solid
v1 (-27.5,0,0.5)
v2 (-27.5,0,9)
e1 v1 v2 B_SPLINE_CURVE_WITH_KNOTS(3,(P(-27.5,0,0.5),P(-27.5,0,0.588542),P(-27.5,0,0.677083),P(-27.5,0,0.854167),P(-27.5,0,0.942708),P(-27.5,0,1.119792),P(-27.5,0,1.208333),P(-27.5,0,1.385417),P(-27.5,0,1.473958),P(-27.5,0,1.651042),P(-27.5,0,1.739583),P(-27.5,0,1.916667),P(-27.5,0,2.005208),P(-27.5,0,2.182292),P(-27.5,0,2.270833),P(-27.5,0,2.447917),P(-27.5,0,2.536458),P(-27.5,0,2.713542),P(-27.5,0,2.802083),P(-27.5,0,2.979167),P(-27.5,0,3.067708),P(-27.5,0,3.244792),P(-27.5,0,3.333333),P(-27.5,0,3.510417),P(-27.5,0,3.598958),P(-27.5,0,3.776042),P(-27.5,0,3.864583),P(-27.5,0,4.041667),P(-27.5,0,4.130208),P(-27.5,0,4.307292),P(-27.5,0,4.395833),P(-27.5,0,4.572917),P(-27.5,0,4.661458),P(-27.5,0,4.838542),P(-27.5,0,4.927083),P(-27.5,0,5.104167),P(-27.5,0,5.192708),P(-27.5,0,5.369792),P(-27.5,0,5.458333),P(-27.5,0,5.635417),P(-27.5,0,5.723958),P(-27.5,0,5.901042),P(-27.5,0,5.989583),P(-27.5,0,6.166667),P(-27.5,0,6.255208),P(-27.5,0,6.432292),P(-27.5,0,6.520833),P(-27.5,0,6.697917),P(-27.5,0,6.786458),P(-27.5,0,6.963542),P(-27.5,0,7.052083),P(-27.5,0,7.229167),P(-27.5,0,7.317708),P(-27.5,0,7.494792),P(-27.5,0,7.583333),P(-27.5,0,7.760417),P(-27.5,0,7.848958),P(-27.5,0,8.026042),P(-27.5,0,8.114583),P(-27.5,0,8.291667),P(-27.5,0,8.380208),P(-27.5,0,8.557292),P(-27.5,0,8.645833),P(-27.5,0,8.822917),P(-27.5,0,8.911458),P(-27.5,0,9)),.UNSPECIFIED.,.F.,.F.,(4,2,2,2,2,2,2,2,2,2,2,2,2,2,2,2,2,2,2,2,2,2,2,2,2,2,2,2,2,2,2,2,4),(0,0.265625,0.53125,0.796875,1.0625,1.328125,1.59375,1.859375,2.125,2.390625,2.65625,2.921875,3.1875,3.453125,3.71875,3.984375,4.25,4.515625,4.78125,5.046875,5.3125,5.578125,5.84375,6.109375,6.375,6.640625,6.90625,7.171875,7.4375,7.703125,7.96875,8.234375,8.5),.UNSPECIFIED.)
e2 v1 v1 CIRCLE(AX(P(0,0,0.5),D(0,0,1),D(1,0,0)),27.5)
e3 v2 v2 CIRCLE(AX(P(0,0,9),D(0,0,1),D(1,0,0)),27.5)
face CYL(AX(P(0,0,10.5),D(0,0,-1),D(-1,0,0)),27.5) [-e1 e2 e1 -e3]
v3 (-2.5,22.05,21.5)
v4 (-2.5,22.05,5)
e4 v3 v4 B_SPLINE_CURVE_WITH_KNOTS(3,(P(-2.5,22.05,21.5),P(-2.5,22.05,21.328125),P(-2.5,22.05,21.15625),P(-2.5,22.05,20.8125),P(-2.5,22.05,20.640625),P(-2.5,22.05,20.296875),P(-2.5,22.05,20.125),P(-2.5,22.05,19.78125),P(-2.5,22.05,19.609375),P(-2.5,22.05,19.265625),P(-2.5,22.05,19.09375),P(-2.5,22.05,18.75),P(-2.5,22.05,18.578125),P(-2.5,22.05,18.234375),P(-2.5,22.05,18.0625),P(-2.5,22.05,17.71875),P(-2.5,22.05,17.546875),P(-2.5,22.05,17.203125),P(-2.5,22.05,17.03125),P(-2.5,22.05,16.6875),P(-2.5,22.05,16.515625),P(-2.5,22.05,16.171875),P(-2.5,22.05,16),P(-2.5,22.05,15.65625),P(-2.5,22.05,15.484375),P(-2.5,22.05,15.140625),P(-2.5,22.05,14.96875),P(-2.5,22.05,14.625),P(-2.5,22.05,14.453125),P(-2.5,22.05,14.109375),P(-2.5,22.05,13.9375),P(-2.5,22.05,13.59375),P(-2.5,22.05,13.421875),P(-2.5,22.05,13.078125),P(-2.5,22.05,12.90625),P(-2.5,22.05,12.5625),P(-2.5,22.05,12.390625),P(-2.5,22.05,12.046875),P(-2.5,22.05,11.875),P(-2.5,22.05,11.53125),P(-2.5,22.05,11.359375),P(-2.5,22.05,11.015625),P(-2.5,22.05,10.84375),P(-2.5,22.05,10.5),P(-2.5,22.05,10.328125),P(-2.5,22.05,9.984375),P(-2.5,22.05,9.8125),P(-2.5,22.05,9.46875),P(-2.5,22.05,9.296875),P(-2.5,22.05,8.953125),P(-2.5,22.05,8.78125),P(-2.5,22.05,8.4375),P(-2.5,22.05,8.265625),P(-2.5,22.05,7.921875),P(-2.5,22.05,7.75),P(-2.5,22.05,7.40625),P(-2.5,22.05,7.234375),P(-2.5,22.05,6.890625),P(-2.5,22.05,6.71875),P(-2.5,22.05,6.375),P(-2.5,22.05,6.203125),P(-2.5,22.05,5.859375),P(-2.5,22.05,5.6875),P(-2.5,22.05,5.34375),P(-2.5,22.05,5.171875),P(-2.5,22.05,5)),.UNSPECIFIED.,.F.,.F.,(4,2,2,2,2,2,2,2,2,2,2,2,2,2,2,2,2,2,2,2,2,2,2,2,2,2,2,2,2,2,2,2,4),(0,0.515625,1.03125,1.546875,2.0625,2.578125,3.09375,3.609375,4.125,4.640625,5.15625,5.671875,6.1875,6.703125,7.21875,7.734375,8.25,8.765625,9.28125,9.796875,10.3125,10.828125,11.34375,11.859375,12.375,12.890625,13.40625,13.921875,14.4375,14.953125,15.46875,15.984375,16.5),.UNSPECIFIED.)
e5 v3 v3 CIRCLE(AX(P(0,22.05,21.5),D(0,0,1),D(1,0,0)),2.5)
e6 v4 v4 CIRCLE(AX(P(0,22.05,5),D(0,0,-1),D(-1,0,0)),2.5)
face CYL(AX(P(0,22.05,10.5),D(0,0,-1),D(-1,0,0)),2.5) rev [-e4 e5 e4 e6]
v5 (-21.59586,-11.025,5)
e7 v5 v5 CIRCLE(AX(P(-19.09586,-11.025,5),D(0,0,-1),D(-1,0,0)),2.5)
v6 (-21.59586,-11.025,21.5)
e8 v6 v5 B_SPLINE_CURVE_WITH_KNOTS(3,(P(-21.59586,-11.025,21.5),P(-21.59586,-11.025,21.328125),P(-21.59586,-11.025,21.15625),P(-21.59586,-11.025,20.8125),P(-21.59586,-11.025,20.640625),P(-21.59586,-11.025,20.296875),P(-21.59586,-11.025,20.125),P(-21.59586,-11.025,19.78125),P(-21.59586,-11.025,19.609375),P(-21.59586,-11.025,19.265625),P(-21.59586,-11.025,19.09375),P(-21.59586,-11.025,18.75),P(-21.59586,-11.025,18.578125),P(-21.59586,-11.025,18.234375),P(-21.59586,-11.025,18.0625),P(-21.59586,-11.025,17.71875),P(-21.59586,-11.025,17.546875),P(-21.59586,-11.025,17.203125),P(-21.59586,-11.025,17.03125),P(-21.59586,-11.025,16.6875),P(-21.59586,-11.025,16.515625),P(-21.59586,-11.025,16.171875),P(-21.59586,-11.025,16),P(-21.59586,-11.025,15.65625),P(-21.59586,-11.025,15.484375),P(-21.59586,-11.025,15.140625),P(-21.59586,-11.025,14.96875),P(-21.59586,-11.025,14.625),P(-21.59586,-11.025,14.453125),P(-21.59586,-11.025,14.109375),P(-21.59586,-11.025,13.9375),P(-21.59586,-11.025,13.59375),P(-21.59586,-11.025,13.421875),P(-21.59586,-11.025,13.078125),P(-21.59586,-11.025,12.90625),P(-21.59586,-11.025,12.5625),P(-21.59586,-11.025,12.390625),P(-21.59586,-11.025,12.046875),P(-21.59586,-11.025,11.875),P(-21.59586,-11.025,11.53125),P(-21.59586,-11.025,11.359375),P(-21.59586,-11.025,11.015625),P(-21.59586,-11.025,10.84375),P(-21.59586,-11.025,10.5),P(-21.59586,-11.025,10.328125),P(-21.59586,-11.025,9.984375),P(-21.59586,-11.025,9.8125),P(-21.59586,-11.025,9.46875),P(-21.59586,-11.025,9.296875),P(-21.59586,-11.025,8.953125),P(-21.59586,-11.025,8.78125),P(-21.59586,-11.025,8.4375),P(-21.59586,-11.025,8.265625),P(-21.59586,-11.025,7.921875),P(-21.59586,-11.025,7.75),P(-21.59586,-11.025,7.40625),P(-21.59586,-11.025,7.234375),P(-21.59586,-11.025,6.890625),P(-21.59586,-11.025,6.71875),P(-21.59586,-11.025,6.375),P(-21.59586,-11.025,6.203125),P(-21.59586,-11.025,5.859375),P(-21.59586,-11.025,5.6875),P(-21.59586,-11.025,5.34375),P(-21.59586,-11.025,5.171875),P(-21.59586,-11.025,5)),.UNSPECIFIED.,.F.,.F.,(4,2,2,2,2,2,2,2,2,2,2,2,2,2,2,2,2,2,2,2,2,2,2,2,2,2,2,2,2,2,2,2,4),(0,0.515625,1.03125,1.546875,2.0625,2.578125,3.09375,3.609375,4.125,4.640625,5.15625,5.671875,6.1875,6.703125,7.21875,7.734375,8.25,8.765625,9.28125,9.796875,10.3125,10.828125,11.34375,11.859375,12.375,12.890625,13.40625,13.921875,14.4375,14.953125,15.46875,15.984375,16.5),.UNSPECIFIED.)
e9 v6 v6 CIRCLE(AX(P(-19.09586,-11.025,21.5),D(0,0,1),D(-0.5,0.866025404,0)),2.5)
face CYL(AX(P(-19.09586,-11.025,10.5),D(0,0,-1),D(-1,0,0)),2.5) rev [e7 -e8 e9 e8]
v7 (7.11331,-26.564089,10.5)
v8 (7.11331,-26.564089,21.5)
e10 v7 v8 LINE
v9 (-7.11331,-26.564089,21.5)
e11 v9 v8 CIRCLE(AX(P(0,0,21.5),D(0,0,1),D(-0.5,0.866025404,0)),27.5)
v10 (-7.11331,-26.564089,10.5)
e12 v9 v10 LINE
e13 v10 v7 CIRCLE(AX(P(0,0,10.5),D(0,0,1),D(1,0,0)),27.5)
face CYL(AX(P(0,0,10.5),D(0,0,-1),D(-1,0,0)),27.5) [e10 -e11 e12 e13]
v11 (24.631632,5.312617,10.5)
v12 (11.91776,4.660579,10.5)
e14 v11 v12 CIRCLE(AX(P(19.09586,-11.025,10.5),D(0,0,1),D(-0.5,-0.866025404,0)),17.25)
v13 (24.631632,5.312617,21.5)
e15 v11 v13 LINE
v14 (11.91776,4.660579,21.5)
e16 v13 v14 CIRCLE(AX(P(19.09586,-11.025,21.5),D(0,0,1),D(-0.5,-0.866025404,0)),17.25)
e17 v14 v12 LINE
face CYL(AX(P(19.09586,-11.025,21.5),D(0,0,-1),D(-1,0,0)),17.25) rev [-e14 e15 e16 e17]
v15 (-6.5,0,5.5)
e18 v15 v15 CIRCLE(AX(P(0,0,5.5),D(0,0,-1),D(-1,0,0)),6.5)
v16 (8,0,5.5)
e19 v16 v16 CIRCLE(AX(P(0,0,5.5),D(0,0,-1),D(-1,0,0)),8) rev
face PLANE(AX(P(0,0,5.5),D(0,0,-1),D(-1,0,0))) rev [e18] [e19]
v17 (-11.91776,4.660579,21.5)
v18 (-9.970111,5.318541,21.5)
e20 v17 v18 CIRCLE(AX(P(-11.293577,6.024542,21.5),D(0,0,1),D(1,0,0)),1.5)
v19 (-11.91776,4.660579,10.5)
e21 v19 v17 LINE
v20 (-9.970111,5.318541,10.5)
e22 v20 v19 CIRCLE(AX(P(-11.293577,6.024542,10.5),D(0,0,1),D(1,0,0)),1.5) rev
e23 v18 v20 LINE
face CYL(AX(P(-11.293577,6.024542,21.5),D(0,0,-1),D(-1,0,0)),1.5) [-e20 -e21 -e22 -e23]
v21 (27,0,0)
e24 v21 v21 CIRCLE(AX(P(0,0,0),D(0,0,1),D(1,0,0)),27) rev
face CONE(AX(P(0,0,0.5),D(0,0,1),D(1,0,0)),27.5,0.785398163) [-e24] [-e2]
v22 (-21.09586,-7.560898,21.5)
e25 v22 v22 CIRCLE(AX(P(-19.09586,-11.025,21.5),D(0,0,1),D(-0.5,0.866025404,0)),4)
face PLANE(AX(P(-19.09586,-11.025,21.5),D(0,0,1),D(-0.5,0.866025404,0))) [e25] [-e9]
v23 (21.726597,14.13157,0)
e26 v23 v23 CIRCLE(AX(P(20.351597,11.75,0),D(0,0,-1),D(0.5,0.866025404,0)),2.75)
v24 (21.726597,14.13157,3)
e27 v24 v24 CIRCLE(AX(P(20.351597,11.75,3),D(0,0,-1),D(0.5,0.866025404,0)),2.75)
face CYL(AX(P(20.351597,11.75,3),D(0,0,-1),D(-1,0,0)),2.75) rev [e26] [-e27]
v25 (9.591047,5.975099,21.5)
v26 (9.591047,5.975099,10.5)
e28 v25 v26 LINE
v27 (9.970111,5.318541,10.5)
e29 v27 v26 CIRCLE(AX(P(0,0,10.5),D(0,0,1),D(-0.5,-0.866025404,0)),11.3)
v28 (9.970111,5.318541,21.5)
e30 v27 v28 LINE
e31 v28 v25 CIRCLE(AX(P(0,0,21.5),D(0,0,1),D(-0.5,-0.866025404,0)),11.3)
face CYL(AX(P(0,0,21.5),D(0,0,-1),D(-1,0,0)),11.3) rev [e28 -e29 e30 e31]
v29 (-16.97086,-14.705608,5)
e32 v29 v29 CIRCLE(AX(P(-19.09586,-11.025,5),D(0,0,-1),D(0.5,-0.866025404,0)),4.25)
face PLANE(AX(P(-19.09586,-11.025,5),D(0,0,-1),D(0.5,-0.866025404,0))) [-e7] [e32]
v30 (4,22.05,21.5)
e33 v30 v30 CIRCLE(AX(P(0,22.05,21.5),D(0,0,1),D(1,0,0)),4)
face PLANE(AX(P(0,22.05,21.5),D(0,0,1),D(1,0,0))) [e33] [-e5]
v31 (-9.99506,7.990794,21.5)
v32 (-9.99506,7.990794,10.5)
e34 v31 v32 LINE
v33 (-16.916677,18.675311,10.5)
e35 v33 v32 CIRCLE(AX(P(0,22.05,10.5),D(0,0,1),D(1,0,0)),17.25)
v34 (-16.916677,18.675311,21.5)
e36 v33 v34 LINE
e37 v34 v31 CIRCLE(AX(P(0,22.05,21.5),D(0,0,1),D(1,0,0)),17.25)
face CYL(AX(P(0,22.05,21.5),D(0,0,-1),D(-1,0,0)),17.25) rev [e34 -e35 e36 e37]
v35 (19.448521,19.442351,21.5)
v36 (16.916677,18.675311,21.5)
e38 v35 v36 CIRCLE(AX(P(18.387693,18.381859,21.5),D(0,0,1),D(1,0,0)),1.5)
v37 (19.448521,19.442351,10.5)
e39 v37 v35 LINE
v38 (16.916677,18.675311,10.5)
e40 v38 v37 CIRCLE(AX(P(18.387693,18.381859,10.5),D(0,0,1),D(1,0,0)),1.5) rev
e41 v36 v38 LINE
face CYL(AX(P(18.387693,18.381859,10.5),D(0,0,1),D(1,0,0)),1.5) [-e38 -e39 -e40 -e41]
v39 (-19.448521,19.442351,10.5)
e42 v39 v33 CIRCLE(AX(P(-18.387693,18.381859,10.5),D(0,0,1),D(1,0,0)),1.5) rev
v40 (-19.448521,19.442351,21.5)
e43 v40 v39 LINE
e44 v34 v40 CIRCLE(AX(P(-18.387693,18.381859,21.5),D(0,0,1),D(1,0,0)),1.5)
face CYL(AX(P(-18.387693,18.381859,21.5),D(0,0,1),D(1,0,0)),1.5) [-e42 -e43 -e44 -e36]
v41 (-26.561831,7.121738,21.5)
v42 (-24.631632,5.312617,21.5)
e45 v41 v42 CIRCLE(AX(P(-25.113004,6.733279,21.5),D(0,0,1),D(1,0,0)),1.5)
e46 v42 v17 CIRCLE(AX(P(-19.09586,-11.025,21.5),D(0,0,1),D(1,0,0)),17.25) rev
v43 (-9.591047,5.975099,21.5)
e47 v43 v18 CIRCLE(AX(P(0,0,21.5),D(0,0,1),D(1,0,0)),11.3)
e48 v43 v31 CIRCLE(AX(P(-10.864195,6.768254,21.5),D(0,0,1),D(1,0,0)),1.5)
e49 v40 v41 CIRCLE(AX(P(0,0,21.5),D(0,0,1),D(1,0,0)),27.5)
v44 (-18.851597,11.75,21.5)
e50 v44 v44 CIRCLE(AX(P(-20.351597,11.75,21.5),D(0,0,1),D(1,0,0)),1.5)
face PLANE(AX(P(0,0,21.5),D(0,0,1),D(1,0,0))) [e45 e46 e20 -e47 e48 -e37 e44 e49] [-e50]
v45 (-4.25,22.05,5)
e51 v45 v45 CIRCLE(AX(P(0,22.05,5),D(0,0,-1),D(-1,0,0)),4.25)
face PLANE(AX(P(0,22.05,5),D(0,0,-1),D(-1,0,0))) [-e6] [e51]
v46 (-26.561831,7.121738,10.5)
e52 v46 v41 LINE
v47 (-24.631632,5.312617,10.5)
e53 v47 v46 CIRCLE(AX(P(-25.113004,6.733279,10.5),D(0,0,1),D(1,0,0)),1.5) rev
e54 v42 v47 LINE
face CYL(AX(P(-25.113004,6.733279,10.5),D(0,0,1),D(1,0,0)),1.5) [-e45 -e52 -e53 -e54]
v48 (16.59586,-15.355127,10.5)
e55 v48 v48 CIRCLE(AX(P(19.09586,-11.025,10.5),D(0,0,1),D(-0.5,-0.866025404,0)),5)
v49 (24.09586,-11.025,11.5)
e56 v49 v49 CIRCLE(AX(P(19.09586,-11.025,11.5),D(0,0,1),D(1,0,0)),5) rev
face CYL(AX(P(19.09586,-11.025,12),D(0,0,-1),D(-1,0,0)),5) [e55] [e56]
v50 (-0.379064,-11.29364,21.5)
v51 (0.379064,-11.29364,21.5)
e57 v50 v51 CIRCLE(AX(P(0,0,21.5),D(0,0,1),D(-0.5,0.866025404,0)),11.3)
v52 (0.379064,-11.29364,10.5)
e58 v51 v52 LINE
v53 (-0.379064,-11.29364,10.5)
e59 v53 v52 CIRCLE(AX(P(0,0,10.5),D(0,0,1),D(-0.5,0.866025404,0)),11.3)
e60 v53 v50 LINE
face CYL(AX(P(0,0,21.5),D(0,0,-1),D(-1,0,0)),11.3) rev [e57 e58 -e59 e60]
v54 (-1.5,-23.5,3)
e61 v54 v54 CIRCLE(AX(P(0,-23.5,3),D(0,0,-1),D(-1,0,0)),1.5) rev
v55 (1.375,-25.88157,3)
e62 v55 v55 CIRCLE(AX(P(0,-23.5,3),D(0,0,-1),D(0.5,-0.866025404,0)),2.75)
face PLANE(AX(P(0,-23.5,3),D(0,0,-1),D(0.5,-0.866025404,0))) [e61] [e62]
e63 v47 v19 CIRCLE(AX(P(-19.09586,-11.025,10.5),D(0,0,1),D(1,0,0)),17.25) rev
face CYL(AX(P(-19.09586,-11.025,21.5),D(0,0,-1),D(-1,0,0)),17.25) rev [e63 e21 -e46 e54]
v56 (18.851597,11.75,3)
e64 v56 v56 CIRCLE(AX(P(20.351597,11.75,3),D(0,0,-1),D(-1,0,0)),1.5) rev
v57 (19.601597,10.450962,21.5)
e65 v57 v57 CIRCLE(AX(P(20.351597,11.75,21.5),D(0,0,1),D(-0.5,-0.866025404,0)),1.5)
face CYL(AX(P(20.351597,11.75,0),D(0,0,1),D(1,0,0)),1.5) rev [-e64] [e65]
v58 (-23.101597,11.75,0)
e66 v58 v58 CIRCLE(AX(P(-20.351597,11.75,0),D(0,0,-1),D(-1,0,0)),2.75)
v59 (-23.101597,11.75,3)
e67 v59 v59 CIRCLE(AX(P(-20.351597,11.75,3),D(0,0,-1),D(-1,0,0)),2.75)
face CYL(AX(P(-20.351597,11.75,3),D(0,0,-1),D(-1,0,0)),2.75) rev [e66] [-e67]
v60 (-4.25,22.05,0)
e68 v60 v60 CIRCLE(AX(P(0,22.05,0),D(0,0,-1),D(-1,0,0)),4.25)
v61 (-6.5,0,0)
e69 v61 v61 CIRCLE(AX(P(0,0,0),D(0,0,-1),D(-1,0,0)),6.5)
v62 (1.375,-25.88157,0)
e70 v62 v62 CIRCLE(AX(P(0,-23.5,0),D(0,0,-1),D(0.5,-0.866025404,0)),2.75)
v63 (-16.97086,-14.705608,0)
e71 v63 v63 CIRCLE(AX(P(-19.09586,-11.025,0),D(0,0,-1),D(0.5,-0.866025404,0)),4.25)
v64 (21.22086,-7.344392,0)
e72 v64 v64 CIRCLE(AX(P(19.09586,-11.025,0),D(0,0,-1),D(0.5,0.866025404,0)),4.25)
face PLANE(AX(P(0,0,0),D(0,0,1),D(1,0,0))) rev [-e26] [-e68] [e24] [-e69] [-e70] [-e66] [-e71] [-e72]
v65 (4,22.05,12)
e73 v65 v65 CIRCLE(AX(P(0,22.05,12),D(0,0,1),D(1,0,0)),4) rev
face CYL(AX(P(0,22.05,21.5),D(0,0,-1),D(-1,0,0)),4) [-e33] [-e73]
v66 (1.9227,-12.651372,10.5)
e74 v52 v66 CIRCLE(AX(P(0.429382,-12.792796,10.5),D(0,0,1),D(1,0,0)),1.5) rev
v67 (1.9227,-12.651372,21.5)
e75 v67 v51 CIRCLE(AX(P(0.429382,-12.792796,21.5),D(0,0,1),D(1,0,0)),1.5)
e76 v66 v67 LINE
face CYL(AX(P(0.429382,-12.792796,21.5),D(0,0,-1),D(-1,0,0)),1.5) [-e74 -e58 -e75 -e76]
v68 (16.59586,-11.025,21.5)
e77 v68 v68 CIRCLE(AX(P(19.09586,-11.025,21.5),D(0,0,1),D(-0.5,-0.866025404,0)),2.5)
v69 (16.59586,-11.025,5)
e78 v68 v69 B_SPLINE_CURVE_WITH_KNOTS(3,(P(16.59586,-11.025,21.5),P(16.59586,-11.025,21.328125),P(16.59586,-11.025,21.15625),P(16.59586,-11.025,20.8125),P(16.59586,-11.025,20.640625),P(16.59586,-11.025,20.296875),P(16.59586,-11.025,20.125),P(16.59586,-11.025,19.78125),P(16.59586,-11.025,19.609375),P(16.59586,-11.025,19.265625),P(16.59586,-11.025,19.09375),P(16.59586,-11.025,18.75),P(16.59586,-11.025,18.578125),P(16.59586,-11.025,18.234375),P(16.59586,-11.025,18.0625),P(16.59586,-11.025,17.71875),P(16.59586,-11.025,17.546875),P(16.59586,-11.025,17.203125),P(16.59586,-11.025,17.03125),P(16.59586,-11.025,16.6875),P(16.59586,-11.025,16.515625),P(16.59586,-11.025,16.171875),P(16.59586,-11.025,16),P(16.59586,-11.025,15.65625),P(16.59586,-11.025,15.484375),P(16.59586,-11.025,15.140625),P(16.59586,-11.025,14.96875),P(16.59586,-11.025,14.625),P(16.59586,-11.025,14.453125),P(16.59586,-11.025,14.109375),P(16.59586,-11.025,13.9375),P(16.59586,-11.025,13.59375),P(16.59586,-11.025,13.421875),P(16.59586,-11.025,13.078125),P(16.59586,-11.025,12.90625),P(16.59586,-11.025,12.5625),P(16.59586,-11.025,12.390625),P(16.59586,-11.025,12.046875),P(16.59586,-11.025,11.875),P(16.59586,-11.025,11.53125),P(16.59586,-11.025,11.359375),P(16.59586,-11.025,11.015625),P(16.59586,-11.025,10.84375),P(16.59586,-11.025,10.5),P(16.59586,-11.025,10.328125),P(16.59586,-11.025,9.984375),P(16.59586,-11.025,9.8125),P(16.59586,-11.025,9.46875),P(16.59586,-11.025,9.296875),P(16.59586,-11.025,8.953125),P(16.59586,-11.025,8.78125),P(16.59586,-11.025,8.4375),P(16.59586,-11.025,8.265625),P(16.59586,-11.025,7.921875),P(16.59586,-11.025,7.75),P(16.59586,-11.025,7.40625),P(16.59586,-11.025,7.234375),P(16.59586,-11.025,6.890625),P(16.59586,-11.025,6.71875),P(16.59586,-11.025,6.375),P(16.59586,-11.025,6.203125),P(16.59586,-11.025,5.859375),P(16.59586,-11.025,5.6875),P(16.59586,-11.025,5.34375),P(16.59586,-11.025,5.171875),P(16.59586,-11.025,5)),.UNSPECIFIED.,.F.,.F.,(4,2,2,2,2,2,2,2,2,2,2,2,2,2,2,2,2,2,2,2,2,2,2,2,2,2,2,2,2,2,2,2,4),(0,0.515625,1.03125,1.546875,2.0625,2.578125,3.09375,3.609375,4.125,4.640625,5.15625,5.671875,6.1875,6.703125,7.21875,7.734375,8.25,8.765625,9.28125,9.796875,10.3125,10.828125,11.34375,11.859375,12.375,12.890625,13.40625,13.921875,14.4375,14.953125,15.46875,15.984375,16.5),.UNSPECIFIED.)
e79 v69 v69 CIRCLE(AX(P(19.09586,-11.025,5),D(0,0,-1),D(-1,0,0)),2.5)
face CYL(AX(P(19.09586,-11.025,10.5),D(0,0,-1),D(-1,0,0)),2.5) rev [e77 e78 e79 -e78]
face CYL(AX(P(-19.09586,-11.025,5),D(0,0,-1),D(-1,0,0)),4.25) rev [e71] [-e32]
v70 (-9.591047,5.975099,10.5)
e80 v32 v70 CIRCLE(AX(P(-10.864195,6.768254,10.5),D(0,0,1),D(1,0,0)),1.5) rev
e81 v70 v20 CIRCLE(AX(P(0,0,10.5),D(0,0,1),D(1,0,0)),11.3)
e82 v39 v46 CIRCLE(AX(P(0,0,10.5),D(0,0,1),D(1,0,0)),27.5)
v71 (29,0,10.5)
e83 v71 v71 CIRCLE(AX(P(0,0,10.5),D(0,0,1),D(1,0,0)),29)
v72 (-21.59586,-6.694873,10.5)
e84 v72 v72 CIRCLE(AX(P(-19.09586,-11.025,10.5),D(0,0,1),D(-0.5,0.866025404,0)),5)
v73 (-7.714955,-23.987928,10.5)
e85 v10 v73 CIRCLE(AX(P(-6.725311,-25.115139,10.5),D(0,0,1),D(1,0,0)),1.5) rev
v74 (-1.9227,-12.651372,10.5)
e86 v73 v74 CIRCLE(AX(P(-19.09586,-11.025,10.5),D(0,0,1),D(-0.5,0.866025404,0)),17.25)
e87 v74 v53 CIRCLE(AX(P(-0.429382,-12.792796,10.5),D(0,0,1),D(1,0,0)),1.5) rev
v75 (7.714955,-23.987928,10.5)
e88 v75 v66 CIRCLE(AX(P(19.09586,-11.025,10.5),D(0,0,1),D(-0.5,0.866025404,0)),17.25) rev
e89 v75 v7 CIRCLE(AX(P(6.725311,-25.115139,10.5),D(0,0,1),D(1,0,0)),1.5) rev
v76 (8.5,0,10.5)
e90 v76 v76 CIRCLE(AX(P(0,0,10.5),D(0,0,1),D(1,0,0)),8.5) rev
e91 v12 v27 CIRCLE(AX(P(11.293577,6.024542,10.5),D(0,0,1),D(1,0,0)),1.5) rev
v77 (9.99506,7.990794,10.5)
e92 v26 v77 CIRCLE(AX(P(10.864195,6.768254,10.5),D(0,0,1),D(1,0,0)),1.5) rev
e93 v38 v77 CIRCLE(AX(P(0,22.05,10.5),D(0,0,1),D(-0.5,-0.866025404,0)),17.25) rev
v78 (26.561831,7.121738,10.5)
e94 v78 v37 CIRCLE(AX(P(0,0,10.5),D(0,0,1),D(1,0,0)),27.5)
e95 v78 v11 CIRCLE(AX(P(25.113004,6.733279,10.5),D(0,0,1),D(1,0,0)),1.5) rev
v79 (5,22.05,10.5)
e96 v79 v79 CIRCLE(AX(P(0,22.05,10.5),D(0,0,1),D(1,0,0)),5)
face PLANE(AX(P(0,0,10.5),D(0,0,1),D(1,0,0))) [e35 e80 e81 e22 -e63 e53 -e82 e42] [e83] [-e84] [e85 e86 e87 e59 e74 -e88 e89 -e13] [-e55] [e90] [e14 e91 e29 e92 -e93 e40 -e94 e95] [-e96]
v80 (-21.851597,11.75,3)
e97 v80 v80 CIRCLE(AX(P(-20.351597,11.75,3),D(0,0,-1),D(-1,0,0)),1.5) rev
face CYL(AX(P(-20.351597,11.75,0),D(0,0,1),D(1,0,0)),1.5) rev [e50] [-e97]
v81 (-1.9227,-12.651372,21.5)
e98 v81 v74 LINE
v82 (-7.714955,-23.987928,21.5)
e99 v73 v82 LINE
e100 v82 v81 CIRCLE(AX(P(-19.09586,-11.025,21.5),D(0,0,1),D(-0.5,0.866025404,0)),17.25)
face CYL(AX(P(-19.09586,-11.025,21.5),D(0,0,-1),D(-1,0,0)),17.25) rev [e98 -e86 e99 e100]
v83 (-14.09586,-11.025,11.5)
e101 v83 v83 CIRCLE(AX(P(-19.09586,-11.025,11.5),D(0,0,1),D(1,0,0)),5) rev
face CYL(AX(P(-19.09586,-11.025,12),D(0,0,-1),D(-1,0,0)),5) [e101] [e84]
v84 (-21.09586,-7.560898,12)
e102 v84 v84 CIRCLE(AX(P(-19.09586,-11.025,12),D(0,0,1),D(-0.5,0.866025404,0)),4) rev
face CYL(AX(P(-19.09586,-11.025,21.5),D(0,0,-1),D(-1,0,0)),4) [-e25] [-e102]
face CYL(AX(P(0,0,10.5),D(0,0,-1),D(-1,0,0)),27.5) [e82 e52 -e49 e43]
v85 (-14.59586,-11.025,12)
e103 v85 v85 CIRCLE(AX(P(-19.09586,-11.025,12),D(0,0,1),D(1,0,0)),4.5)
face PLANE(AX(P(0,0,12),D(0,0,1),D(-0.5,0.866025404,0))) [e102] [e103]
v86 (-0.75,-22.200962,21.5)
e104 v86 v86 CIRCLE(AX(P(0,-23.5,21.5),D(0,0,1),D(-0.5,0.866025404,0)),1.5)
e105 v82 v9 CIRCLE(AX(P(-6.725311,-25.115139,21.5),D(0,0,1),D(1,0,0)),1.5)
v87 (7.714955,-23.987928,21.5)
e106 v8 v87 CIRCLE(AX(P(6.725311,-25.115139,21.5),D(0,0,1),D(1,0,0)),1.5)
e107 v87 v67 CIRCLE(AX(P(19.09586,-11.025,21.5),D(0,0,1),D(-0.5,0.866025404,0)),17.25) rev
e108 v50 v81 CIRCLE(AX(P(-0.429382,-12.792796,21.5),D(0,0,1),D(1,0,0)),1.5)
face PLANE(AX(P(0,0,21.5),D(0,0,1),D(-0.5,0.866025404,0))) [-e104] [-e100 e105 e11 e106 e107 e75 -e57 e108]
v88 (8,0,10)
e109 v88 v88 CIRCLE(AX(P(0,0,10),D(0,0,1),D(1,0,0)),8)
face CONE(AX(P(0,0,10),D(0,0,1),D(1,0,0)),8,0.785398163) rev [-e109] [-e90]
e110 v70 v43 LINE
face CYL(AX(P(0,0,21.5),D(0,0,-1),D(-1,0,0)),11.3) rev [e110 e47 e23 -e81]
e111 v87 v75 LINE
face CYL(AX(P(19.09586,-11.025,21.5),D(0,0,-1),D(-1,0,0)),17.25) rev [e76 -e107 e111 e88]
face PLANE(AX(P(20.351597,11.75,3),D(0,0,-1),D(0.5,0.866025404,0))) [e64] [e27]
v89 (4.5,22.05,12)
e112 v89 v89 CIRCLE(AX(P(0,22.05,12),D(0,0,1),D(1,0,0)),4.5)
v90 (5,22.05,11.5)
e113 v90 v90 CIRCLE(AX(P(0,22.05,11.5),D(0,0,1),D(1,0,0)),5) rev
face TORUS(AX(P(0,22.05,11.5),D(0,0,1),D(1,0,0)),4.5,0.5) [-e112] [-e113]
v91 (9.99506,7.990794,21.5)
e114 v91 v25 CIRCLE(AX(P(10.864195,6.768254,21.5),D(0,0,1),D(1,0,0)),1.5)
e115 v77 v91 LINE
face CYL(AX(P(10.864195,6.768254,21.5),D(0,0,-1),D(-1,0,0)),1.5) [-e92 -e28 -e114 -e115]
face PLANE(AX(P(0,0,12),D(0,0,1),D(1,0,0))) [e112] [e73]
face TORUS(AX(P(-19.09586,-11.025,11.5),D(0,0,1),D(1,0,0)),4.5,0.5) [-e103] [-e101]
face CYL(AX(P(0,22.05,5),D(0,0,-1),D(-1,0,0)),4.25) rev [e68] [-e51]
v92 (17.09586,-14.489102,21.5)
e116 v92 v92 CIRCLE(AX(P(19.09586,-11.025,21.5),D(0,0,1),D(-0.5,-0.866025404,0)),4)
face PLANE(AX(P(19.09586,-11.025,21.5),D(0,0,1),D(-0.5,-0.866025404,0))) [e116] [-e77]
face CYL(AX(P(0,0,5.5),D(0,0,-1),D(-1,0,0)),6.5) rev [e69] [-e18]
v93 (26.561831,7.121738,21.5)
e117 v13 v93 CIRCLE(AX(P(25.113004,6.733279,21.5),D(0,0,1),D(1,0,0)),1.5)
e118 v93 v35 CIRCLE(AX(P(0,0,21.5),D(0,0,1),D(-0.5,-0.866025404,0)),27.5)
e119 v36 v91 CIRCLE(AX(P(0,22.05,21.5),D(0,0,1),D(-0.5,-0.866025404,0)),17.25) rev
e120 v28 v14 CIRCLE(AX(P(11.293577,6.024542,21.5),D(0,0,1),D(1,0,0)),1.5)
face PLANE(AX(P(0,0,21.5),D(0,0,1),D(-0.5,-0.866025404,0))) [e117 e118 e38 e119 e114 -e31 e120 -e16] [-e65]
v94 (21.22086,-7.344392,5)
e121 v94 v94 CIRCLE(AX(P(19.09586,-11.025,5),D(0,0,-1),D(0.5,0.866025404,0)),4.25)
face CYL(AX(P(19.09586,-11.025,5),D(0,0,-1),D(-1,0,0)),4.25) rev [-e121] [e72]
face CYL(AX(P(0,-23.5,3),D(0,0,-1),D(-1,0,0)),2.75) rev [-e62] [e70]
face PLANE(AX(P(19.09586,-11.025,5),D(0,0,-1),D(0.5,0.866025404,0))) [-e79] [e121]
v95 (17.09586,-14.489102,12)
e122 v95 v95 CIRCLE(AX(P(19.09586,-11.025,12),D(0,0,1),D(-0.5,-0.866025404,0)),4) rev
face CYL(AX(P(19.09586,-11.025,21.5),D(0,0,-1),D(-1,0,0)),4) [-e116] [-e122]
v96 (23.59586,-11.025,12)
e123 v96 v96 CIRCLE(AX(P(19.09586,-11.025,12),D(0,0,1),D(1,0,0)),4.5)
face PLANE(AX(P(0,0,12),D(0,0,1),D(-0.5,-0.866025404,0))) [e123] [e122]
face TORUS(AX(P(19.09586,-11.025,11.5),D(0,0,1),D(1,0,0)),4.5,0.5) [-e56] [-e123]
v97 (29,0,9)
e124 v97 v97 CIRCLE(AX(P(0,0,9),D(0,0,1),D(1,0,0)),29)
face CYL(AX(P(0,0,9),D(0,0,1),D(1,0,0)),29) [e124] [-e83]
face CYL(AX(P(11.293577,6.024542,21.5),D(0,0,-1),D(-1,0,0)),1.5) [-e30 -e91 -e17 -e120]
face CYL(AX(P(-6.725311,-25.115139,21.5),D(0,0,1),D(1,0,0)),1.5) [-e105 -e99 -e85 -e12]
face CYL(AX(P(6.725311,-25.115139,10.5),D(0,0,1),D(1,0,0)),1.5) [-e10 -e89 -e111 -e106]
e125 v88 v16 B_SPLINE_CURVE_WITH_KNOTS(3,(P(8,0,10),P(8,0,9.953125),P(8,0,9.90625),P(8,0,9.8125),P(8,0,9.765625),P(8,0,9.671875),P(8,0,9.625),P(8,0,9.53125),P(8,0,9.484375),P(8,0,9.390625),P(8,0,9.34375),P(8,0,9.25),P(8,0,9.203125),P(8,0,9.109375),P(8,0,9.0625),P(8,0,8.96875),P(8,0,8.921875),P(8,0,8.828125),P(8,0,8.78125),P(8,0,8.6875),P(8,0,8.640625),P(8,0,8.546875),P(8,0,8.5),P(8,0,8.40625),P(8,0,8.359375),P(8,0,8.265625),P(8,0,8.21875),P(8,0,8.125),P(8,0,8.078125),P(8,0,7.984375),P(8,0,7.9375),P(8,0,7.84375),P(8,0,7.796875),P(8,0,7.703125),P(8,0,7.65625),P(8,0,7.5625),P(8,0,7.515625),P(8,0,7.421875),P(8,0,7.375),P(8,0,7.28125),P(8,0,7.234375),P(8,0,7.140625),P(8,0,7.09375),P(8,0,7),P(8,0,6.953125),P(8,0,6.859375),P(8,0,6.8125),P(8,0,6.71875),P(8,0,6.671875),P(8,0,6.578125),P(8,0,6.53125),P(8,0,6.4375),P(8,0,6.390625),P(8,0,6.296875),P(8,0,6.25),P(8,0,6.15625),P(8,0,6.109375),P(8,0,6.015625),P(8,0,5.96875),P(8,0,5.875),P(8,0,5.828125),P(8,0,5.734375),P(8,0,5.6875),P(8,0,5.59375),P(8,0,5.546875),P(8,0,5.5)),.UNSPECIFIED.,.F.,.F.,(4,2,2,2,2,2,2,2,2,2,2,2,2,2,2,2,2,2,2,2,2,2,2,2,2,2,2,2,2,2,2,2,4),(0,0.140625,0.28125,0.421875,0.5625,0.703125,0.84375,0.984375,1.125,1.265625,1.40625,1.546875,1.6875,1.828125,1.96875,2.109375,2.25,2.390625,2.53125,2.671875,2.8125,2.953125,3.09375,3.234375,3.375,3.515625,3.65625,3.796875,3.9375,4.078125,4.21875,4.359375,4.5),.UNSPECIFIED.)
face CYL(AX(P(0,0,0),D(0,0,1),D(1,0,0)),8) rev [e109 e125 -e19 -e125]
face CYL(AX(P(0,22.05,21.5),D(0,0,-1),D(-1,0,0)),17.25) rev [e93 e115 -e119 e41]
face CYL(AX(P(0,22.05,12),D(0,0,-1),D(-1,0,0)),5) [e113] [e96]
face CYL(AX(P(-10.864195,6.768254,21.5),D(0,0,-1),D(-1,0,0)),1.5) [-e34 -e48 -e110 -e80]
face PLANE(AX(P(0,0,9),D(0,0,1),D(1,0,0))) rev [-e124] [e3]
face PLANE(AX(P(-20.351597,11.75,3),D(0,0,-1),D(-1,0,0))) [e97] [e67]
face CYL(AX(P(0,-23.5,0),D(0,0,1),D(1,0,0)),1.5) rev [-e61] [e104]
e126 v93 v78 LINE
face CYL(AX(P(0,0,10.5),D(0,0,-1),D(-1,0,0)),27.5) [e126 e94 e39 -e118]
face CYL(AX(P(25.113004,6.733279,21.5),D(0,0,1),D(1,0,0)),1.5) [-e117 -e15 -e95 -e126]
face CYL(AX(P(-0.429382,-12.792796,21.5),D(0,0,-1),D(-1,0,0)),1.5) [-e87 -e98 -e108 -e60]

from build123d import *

# Parameters (mm, degrees)
SKETCH1_R                = 27.5
SKETCH1_R_2              = 2.5
BOSS_EXTRUDE1_DEPTH      = 10.5
SKETCH2_R                = 4
SKETCH2_R_2              = 2.5
BOSS_EXTRUDE2_DEPTH      = 11
SKETCH3_R                = 5
SKETCH3_R_2              = 4
BOSS_EXTRUDE3_DEPTH      = 1.5
BOSS_EXTRUDE4_DEPTH      = 11
FILLET2_R                = 0.5
FILLET5_R                = 1.5
CIRPATTERN1_COUNT        = 3
FILLET2_OF_CIRPATTERN1_R = 0.5
FILLET5_OF_CIRPATTERN1_R = 1.5
SKETCH5_R                = 1.5
CUT_EXTRUDE1_DEPTH       = 45.438159278
SKETCH6_R                = 2.75
CUT_EXTRUDE2_DEPTH       = 3
SKETCH7_R                = 4.25
CUT_EXTRUDE3_DEPTH       = 5
CIRPATTERN2_COUNT        = 3
CHAMFER1_SIZE            = 0.5
SKETCH9_R                = 8
CUT_EXTRUDE4_DEPTH       = 41.416580756
BOSS_EXTRUDE7_START      = -5.5
SKETCH10_R               = 8
SKETCH10_R_2             = 6.5
BOSS_EXTRUDE7_DEPTH      = 5.5
CHAMFER2_SIZE            = 0.5
BOSS_EXTRUDE8_START      = -1.5
SKETCH11_R               = 29
SKETCH11_R_2             = 27.5
BOSS_EXTRUDE8_DEPTH      = 1.5


with BuildPart() as part:
    # Sketch1 → Boss-Extrude1 (new body)
    with BuildSketch(Plane.XY):
        with Locations(Location((0, 0, 0), (0, 0, 180))):
            Circle(SKETCH1_R)
        with Locations(Location((0, 22.05, 0), (0, 0, 180))):
            Circle(SKETCH1_R_2, mode=Mode.SUBTRACT)
        with Locations(Location((19.095860153, -11.025, 0), (0, 0, 180))):
            Circle(SKETCH1_R_2, mode=Mode.SUBTRACT)
        with Locations(Location((-19.095860153, -11.025, 0), (0, 0, 180))):
            Circle(SKETCH1_R_2, mode=Mode.SUBTRACT)
    extrude(amount=BOSS_EXTRUDE1_DEPTH)

    # Sketch2 → Boss-Extrude2 (add)
    with BuildSketch(Plane.XY.offset(10.5)):
        with Locations((0, 22.05)):
            Circle(SKETCH2_R)
        with Locations(Location((0, 22.05, 0), (0, 0, 180))):
            Circle(SKETCH2_R_2, mode=Mode.SUBTRACT)
    boss_extrude2 = extrude(amount=BOSS_EXTRUDE2_DEPTH)

    # Sketch3 → Boss-Extrude3 (add)
    with BuildSketch(Plane.XY.offset(10.5)):
        with Locations((0, 22.05)):
            Circle(SKETCH3_R)
        with Locations((0, 22.05)):
            Circle(SKETCH3_R_2, mode=Mode.SUBTRACT)
    boss_extrude3 = extrude(amount=BOSS_EXTRUDE3_DEPTH)

    # Sketch4 → Boss-Extrude4 (add)
    with BuildSketch(Plane.XY.offset(10.5)):
        with BuildLine():
            ThreePointArc((-8.731428479, 7.173015873), (-14.812140242, 13.209015809), (-17.238712835, 21.426077098))
            ThreePointArc((-17.238712835, 21.426077098), (-23.815698604, 13.75), (-27.174883487, 4.216124695))
            ThreePointArc((-27.174883487, 4.216124695), (-18.845413371, 6.223181829), (-10.577728207, 3.975130938))
            ThreePointArc((-10.577728207, 3.975130938), (-9.786087063, 5.65), (-8.731428479, 7.173015873))
        make_face()
    boss_extrude4 = extrude(amount=BOSS_EXTRUDE4_DEPTH)

    # Fillet2
    fillet2_edges = [part.edges().sort_by_distance(p)[0] for p in [
        (-5, 22.05, 12),
    ]]
    fillet(fillet2_edges, radius=FILLET2_R)

    # Fillet5
    # the kernel refuses this fillet: 1.5 mm, written as the material it takes off along each edge
    with BuildSketch(Plane(origin=(-17.238712835, 21.426077098, 10.5), x_dir=(0.11627707658946446, -0.9932168149300573, 0), z_dir=(0, 0, 1))) as fillet5_piece_1:
        with BuildLine():
            CenterArc((2.88996817, -1.495158903), FILLET5_R, 94.604481761, 123.727317632)
            ThreePointArc((1.713319765, -2.425480639), (0.8238966, -1.235883765), (0, 0))
            ThreePointArc((0, 0), (1.384776415, -0.055672613), (2.769552829, 0))
        make_face()
    extrude(amount=18.423956554, mode=Mode.SUBTRACT)
    with BuildSketch(Plane(origin=(-27.174883487, 4.216124695, 10.5), x_dir=(0.9182895314900276, 0.39590950526076735, 0), z_dir=(0, 0, 1))) as fillet5_piece_2:
        with BuildLine():
            CenterArc((2.88996817, 1.495158903), FILLET5_R, 141.668200607, 123.727317632)
            ThreePointArc((1.713319765, 2.425480639), (0.8238966, 1.235883765), (0, 0))
            ThreePointArc((0, 0), (1.384776415, 0.055672613), (2.769552829, 0))
        make_face()
    extrude(amount=18.423956554, mode=Mode.SUBTRACT)
    with BuildSketch(Plane(origin=(-10.577728207, 3.975130938, 10.5), x_dir=(-0.8902885516550605, 0.4553968541743943, 0), z_dir=(0, 0, 1))) as fillet5_piece_3:
        with BuildLine():
            CenterArc((1.570607816, -1.498571769), FILLET5_R, 92.500493645, 86.512353367)
            ThreePointArc((0.070830441, -1.472729442), (0.059461178, -0.735208239), (0, 0))
            ThreePointArc((0, 0), (0.752582912, -0.016424661), (1.505165824, 0))
        make_face()
    extrude(amount=14.762914559, mode=Mode.SUBTRACT)
    with BuildSketch(Plane(origin=(-8.731428479, 7.173015873, 10.5), x_dir=(-0.5830170750372249, -0.8124599006812822, 0), z_dir=(0, 0, 1))) as fillet5_piece_4:
        with BuildLine():
            CenterArc((1.572292256, -1.496804369), FILLET5_R, 93.740653048, 86.512353367)
            ThreePointArc((0.07230688, -1.50342804), (0.052559138, -0.750924993), (0, 0))
            ThreePointArc((0, 0), (0.737215871, -0.024073752), (1.474431742, 0))
        make_face()
    extrude(amount=14.762914559, mode=Mode.SUBTRACT)

    # CirPattern1: Boss-Extrude2, Boss-Extrude3, Boss-Extrude4 ×3 about axis
    cirpattern1_axis = Axis((0, 0, 0), (0, 0, 1))
    add([boss_extrude2.rotate(cirpattern1_axis, i * 360 / CIRPATTERN1_COUNT) for i in range(1, CIRPATTERN1_COUNT)])
    add([boss_extrude3.rotate(cirpattern1_axis, i * 360 / CIRPATTERN1_COUNT) for i in range(1, CIRPATTERN1_COUNT)])
    add([boss_extrude4.rotate(cirpattern1_axis, i * 360 / CIRPATTERN1_COUNT) for i in range(1, CIRPATTERN1_COUNT)])

    # Fillet2 of CirPattern1
    fillet2_of_cirpattern1_edges = [part.edges().sort_by_distance(p)[0] for p in [
        (-16.595860153, -15.355127019, 12),
        (21.595860153, -6.694872981, 12),
    ]]
    fillet(fillet2_of_cirpattern1_edges, radius=FILLET2_OF_CIRPATTERN1_R)

    # Fillet5 of CirPattern1
    # the kernel refuses this fillet: 1.5 mm, written as the material it takes off along each edge
    with BuildSketch(Plane(origin=(-9.936170652, -25.642201793, 10.5), x_dir=(0.950591872836604, -0.31044337856845616, 0), z_dir=(0, 0, 1))) as fillet5_of_cirpattern1_piece_1:
        with BuildLine():
            CenterArc((2.888594005, 1.497812019), FILLET5_OF_CIRPATTERN1_R, 149.367724673, 123.727317632)
            ThreePointArc((1.597911292, 2.262101319), (0.844427641, 1.098929988), (0, 0))
            ThreePointArc((0, 0), (1.484791311, -0.040112987), (2.969582622, 0))
        make_face()
    extrude(amount=18.423956554, mode=Mode.SUBTRACT)
    with BuildSketch(Plane(origin=(9.936170652, -25.642201793, 10.5), x_dir=(-0.9505918728365876, -0.31044337856850573, 0), z_dir=(0, 0, 1))) as fillet5_of_cirpattern1_piece_2:
        with BuildLine():
            CenterArc((2.888594005, -1.497812019), FILLET5_OF_CIRPATTERN1_R, 86.904957695, 123.727317632)
            ThreePointArc((1.597911292, -2.262101319), (0.844427641, -1.098929988), (0, 0))
            ThreePointArc((0, 0), (1.484791311, 0.040112987), (2.969582622, 0))
        make_face()
    extrude(amount=18.423956554, mode=Mode.SUBTRACT)
    with BuildSketch(Plane(origin=(1.846299728, -11.148146811, 10.5), x_dir=(0.050759031308987616, -0.998710929518934, 0), z_dir=(0, 0, 1)), Plane(origin=(8.731428479, 7.173015873, 10.5), x_dir=(0.8395295203460723, 0.5433140753445413, 0), z_dir=(0, 0, 1))) as fillet5_of_cirpattern1_piece_3:
        with BuildLine():
            CenterArc((1.570607816, -1.498571769), FILLET5_OF_CIRPATTERN1_R, 92.500493645, 86.512353367)
            ThreePointArc((0.070830441, -1.472729442), (0.059461178, -0.735208239), (0, 0))
            ThreePointArc((0, 0), (0.752582912, -0.016424661), (1.505165824, 0))
        make_face()
    extrude(amount=14.762914559, mode=Mode.SUBTRACT)
    with BuildSketch(Plane(origin=(-1.846299728, -11.148146811, 10.5), x_dir=(0.9951194510647849, -0.09867764748169308, 0), z_dir=(0, 0, 1)), Plane(origin=(10.577728207, 3.975130938, 10.5), x_dir=(-0.41210237602756, 0.9111375481629761, 0), z_dir=(0, 0, 1))) as fillet5_of_cirpattern1_piece_4:
        with BuildLine():
            CenterArc((1.572292256, -1.496804369), FILLET5_OF_CIRPATTERN1_R, 93.740653048, 86.512353367)
            ThreePointArc((0.07230688, -1.50342804), (0.052559138, -0.750924993), (0, 0))
            ThreePointArc((0, 0), (0.737215871, -0.024073752), (1.474431742, 0))
        make_face()
    extrude(amount=14.762914559, mode=Mode.SUBTRACT)
    with BuildSketch(Plane(origin=(27.174883487, 4.216124695, 10.5), x_dir=(-0.918289531490027, 0.3959095052607686, 0), z_dir=(0, 0, 1))) as fillet5_of_cirpattern1_piece_5:
        with BuildLine():
            CenterArc((2.88996817, -1.495158903), FILLET5_OF_CIRPATTERN1_R, 94.604481761, 123.727317632)
            ThreePointArc((1.713319765, -2.425480639), (0.8238966, -1.235883765), (0, 0))
            ThreePointArc((0, 0), (1.384776415, -0.055672613), (2.769552829, 0))
        make_face()
    extrude(amount=18.423956554, mode=Mode.SUBTRACT)
    with BuildSketch(Plane(origin=(17.238712835, 21.426077098, 10.5), x_dir=(-0.11627707658945366, -0.9932168149300585, 0), z_dir=(0, 0, 1))) as fillet5_of_cirpattern1_piece_6:
        with BuildLine():
            CenterArc((2.88996817, 1.495158903), FILLET5_OF_CIRPATTERN1_R, 141.668200607, 123.727317632)
            ThreePointArc((1.713319765, 2.425480639), (0.8238966, 1.235883765), (0, 0))
            ThreePointArc((0, 0), (1.384776415, 0.055672613), (2.769552829, 0))
        make_face()
    extrude(amount=18.423956554, mode=Mode.SUBTRACT)

    # Sketch5 → Cut-Extrude1 (cut, through all)
    with BuildSketch(Plane.XY.offset(21.5)):
        with Locations((-20.351596989, 11.75)):
            Circle(SKETCH5_R)
    cut_extrude1 = extrude(amount=-CUT_EXTRUDE1_DEPTH, mode=Mode.SUBTRACT)

    # Sketch6 → Cut-Extrude2 (cut)
    with BuildSketch(Plane(origin=(0, 0, 0), x_dir=(-1, 0, 0), z_dir=(0, 0, -1))):
        with Locations((20.351596989, 11.75)):
            Circle(SKETCH6_R)
    cut_extrude2 = extrude(amount=-CUT_EXTRUDE2_DEPTH, mode=Mode.SUBTRACT)

    # Sketch7 → Cut-Extrude3 (cut)
    with BuildSketch(Plane(origin=(0, 0, 0), x_dir=(-1, 0, 0), z_dir=(0, 0, -1))):
        with Locations((0, 22.05)):
            Circle(SKETCH7_R)
    cut_extrude3 = extrude(amount=-CUT_EXTRUDE3_DEPTH, mode=Mode.SUBTRACT)

    # CirPattern2: Cut-Extrude1, Cut-Extrude2, Cut-Extrude3 ×3 about axis
    cirpattern2_axis = Axis((0, 0, 0), (0, 0, 1))
    add([cut_extrude1.rotate(cirpattern2_axis, i * 360 / CIRPATTERN2_COUNT) for i in range(1, CIRPATTERN2_COUNT)], mode=Mode.SUBTRACT)
    add([cut_extrude2.rotate(cirpattern2_axis, i * 360 / CIRPATTERN2_COUNT) for i in range(1, CIRPATTERN2_COUNT)], mode=Mode.SUBTRACT)
    add([cut_extrude3.rotate(cirpattern2_axis, i * 360 / CIRPATTERN2_COUNT) for i in range(1, CIRPATTERN2_COUNT)], mode=Mode.SUBTRACT)

    # Chamfer1
    chamfer1_edges = [part.edges().sort_by_distance(p)[0] for p in [
        (27.5, 0, 0),
    ]]
    chamfer(chamfer1_edges, length=CHAMFER1_SIZE)

    # Sketch9 → Cut-Extrude4 (cut, through all)
    with BuildSketch(Plane.XY.offset(10.5)):
        Circle(SKETCH9_R)
    extrude(amount=-CUT_EXTRUDE4_DEPTH, mode=Mode.SUBTRACT)

    # Sketch10 → Boss-Extrude7 (add)
    with BuildSketch(Plane(origin=(0, 0, 0), x_dir=(-1, 0, 0), z_dir=(0, 0, -1)).offset(BOSS_EXTRUDE7_START)):
        with Locations(Location((0, 0, 0), (0, 0, 180))):
            Circle(SKETCH10_R)
        Circle(SKETCH10_R_2, mode=Mode.SUBTRACT)
    extrude(amount=BOSS_EXTRUDE7_DEPTH)

    # Chamfer2
    chamfer2_edges = [part.edges().sort_by_distance(p)[0] for p in [
        (-8, 0, 10.5),
    ]]
    chamfer(chamfer2_edges, length=CHAMFER2_SIZE)

    # Sketch11 → Boss-Extrude8 (add)
    with BuildSketch(Plane.XY.offset(10.5).offset(BOSS_EXTRUDE8_START)):
        Circle(SKETCH11_R)
        with Locations(Location((0, 0, 0), (0, 0, 180))):
            Circle(SKETCH11_R_2, mode=Mode.SUBTRACT)
    extrude(amount=BOSS_EXTRUDE8_DEPTH)


solid = part.part
